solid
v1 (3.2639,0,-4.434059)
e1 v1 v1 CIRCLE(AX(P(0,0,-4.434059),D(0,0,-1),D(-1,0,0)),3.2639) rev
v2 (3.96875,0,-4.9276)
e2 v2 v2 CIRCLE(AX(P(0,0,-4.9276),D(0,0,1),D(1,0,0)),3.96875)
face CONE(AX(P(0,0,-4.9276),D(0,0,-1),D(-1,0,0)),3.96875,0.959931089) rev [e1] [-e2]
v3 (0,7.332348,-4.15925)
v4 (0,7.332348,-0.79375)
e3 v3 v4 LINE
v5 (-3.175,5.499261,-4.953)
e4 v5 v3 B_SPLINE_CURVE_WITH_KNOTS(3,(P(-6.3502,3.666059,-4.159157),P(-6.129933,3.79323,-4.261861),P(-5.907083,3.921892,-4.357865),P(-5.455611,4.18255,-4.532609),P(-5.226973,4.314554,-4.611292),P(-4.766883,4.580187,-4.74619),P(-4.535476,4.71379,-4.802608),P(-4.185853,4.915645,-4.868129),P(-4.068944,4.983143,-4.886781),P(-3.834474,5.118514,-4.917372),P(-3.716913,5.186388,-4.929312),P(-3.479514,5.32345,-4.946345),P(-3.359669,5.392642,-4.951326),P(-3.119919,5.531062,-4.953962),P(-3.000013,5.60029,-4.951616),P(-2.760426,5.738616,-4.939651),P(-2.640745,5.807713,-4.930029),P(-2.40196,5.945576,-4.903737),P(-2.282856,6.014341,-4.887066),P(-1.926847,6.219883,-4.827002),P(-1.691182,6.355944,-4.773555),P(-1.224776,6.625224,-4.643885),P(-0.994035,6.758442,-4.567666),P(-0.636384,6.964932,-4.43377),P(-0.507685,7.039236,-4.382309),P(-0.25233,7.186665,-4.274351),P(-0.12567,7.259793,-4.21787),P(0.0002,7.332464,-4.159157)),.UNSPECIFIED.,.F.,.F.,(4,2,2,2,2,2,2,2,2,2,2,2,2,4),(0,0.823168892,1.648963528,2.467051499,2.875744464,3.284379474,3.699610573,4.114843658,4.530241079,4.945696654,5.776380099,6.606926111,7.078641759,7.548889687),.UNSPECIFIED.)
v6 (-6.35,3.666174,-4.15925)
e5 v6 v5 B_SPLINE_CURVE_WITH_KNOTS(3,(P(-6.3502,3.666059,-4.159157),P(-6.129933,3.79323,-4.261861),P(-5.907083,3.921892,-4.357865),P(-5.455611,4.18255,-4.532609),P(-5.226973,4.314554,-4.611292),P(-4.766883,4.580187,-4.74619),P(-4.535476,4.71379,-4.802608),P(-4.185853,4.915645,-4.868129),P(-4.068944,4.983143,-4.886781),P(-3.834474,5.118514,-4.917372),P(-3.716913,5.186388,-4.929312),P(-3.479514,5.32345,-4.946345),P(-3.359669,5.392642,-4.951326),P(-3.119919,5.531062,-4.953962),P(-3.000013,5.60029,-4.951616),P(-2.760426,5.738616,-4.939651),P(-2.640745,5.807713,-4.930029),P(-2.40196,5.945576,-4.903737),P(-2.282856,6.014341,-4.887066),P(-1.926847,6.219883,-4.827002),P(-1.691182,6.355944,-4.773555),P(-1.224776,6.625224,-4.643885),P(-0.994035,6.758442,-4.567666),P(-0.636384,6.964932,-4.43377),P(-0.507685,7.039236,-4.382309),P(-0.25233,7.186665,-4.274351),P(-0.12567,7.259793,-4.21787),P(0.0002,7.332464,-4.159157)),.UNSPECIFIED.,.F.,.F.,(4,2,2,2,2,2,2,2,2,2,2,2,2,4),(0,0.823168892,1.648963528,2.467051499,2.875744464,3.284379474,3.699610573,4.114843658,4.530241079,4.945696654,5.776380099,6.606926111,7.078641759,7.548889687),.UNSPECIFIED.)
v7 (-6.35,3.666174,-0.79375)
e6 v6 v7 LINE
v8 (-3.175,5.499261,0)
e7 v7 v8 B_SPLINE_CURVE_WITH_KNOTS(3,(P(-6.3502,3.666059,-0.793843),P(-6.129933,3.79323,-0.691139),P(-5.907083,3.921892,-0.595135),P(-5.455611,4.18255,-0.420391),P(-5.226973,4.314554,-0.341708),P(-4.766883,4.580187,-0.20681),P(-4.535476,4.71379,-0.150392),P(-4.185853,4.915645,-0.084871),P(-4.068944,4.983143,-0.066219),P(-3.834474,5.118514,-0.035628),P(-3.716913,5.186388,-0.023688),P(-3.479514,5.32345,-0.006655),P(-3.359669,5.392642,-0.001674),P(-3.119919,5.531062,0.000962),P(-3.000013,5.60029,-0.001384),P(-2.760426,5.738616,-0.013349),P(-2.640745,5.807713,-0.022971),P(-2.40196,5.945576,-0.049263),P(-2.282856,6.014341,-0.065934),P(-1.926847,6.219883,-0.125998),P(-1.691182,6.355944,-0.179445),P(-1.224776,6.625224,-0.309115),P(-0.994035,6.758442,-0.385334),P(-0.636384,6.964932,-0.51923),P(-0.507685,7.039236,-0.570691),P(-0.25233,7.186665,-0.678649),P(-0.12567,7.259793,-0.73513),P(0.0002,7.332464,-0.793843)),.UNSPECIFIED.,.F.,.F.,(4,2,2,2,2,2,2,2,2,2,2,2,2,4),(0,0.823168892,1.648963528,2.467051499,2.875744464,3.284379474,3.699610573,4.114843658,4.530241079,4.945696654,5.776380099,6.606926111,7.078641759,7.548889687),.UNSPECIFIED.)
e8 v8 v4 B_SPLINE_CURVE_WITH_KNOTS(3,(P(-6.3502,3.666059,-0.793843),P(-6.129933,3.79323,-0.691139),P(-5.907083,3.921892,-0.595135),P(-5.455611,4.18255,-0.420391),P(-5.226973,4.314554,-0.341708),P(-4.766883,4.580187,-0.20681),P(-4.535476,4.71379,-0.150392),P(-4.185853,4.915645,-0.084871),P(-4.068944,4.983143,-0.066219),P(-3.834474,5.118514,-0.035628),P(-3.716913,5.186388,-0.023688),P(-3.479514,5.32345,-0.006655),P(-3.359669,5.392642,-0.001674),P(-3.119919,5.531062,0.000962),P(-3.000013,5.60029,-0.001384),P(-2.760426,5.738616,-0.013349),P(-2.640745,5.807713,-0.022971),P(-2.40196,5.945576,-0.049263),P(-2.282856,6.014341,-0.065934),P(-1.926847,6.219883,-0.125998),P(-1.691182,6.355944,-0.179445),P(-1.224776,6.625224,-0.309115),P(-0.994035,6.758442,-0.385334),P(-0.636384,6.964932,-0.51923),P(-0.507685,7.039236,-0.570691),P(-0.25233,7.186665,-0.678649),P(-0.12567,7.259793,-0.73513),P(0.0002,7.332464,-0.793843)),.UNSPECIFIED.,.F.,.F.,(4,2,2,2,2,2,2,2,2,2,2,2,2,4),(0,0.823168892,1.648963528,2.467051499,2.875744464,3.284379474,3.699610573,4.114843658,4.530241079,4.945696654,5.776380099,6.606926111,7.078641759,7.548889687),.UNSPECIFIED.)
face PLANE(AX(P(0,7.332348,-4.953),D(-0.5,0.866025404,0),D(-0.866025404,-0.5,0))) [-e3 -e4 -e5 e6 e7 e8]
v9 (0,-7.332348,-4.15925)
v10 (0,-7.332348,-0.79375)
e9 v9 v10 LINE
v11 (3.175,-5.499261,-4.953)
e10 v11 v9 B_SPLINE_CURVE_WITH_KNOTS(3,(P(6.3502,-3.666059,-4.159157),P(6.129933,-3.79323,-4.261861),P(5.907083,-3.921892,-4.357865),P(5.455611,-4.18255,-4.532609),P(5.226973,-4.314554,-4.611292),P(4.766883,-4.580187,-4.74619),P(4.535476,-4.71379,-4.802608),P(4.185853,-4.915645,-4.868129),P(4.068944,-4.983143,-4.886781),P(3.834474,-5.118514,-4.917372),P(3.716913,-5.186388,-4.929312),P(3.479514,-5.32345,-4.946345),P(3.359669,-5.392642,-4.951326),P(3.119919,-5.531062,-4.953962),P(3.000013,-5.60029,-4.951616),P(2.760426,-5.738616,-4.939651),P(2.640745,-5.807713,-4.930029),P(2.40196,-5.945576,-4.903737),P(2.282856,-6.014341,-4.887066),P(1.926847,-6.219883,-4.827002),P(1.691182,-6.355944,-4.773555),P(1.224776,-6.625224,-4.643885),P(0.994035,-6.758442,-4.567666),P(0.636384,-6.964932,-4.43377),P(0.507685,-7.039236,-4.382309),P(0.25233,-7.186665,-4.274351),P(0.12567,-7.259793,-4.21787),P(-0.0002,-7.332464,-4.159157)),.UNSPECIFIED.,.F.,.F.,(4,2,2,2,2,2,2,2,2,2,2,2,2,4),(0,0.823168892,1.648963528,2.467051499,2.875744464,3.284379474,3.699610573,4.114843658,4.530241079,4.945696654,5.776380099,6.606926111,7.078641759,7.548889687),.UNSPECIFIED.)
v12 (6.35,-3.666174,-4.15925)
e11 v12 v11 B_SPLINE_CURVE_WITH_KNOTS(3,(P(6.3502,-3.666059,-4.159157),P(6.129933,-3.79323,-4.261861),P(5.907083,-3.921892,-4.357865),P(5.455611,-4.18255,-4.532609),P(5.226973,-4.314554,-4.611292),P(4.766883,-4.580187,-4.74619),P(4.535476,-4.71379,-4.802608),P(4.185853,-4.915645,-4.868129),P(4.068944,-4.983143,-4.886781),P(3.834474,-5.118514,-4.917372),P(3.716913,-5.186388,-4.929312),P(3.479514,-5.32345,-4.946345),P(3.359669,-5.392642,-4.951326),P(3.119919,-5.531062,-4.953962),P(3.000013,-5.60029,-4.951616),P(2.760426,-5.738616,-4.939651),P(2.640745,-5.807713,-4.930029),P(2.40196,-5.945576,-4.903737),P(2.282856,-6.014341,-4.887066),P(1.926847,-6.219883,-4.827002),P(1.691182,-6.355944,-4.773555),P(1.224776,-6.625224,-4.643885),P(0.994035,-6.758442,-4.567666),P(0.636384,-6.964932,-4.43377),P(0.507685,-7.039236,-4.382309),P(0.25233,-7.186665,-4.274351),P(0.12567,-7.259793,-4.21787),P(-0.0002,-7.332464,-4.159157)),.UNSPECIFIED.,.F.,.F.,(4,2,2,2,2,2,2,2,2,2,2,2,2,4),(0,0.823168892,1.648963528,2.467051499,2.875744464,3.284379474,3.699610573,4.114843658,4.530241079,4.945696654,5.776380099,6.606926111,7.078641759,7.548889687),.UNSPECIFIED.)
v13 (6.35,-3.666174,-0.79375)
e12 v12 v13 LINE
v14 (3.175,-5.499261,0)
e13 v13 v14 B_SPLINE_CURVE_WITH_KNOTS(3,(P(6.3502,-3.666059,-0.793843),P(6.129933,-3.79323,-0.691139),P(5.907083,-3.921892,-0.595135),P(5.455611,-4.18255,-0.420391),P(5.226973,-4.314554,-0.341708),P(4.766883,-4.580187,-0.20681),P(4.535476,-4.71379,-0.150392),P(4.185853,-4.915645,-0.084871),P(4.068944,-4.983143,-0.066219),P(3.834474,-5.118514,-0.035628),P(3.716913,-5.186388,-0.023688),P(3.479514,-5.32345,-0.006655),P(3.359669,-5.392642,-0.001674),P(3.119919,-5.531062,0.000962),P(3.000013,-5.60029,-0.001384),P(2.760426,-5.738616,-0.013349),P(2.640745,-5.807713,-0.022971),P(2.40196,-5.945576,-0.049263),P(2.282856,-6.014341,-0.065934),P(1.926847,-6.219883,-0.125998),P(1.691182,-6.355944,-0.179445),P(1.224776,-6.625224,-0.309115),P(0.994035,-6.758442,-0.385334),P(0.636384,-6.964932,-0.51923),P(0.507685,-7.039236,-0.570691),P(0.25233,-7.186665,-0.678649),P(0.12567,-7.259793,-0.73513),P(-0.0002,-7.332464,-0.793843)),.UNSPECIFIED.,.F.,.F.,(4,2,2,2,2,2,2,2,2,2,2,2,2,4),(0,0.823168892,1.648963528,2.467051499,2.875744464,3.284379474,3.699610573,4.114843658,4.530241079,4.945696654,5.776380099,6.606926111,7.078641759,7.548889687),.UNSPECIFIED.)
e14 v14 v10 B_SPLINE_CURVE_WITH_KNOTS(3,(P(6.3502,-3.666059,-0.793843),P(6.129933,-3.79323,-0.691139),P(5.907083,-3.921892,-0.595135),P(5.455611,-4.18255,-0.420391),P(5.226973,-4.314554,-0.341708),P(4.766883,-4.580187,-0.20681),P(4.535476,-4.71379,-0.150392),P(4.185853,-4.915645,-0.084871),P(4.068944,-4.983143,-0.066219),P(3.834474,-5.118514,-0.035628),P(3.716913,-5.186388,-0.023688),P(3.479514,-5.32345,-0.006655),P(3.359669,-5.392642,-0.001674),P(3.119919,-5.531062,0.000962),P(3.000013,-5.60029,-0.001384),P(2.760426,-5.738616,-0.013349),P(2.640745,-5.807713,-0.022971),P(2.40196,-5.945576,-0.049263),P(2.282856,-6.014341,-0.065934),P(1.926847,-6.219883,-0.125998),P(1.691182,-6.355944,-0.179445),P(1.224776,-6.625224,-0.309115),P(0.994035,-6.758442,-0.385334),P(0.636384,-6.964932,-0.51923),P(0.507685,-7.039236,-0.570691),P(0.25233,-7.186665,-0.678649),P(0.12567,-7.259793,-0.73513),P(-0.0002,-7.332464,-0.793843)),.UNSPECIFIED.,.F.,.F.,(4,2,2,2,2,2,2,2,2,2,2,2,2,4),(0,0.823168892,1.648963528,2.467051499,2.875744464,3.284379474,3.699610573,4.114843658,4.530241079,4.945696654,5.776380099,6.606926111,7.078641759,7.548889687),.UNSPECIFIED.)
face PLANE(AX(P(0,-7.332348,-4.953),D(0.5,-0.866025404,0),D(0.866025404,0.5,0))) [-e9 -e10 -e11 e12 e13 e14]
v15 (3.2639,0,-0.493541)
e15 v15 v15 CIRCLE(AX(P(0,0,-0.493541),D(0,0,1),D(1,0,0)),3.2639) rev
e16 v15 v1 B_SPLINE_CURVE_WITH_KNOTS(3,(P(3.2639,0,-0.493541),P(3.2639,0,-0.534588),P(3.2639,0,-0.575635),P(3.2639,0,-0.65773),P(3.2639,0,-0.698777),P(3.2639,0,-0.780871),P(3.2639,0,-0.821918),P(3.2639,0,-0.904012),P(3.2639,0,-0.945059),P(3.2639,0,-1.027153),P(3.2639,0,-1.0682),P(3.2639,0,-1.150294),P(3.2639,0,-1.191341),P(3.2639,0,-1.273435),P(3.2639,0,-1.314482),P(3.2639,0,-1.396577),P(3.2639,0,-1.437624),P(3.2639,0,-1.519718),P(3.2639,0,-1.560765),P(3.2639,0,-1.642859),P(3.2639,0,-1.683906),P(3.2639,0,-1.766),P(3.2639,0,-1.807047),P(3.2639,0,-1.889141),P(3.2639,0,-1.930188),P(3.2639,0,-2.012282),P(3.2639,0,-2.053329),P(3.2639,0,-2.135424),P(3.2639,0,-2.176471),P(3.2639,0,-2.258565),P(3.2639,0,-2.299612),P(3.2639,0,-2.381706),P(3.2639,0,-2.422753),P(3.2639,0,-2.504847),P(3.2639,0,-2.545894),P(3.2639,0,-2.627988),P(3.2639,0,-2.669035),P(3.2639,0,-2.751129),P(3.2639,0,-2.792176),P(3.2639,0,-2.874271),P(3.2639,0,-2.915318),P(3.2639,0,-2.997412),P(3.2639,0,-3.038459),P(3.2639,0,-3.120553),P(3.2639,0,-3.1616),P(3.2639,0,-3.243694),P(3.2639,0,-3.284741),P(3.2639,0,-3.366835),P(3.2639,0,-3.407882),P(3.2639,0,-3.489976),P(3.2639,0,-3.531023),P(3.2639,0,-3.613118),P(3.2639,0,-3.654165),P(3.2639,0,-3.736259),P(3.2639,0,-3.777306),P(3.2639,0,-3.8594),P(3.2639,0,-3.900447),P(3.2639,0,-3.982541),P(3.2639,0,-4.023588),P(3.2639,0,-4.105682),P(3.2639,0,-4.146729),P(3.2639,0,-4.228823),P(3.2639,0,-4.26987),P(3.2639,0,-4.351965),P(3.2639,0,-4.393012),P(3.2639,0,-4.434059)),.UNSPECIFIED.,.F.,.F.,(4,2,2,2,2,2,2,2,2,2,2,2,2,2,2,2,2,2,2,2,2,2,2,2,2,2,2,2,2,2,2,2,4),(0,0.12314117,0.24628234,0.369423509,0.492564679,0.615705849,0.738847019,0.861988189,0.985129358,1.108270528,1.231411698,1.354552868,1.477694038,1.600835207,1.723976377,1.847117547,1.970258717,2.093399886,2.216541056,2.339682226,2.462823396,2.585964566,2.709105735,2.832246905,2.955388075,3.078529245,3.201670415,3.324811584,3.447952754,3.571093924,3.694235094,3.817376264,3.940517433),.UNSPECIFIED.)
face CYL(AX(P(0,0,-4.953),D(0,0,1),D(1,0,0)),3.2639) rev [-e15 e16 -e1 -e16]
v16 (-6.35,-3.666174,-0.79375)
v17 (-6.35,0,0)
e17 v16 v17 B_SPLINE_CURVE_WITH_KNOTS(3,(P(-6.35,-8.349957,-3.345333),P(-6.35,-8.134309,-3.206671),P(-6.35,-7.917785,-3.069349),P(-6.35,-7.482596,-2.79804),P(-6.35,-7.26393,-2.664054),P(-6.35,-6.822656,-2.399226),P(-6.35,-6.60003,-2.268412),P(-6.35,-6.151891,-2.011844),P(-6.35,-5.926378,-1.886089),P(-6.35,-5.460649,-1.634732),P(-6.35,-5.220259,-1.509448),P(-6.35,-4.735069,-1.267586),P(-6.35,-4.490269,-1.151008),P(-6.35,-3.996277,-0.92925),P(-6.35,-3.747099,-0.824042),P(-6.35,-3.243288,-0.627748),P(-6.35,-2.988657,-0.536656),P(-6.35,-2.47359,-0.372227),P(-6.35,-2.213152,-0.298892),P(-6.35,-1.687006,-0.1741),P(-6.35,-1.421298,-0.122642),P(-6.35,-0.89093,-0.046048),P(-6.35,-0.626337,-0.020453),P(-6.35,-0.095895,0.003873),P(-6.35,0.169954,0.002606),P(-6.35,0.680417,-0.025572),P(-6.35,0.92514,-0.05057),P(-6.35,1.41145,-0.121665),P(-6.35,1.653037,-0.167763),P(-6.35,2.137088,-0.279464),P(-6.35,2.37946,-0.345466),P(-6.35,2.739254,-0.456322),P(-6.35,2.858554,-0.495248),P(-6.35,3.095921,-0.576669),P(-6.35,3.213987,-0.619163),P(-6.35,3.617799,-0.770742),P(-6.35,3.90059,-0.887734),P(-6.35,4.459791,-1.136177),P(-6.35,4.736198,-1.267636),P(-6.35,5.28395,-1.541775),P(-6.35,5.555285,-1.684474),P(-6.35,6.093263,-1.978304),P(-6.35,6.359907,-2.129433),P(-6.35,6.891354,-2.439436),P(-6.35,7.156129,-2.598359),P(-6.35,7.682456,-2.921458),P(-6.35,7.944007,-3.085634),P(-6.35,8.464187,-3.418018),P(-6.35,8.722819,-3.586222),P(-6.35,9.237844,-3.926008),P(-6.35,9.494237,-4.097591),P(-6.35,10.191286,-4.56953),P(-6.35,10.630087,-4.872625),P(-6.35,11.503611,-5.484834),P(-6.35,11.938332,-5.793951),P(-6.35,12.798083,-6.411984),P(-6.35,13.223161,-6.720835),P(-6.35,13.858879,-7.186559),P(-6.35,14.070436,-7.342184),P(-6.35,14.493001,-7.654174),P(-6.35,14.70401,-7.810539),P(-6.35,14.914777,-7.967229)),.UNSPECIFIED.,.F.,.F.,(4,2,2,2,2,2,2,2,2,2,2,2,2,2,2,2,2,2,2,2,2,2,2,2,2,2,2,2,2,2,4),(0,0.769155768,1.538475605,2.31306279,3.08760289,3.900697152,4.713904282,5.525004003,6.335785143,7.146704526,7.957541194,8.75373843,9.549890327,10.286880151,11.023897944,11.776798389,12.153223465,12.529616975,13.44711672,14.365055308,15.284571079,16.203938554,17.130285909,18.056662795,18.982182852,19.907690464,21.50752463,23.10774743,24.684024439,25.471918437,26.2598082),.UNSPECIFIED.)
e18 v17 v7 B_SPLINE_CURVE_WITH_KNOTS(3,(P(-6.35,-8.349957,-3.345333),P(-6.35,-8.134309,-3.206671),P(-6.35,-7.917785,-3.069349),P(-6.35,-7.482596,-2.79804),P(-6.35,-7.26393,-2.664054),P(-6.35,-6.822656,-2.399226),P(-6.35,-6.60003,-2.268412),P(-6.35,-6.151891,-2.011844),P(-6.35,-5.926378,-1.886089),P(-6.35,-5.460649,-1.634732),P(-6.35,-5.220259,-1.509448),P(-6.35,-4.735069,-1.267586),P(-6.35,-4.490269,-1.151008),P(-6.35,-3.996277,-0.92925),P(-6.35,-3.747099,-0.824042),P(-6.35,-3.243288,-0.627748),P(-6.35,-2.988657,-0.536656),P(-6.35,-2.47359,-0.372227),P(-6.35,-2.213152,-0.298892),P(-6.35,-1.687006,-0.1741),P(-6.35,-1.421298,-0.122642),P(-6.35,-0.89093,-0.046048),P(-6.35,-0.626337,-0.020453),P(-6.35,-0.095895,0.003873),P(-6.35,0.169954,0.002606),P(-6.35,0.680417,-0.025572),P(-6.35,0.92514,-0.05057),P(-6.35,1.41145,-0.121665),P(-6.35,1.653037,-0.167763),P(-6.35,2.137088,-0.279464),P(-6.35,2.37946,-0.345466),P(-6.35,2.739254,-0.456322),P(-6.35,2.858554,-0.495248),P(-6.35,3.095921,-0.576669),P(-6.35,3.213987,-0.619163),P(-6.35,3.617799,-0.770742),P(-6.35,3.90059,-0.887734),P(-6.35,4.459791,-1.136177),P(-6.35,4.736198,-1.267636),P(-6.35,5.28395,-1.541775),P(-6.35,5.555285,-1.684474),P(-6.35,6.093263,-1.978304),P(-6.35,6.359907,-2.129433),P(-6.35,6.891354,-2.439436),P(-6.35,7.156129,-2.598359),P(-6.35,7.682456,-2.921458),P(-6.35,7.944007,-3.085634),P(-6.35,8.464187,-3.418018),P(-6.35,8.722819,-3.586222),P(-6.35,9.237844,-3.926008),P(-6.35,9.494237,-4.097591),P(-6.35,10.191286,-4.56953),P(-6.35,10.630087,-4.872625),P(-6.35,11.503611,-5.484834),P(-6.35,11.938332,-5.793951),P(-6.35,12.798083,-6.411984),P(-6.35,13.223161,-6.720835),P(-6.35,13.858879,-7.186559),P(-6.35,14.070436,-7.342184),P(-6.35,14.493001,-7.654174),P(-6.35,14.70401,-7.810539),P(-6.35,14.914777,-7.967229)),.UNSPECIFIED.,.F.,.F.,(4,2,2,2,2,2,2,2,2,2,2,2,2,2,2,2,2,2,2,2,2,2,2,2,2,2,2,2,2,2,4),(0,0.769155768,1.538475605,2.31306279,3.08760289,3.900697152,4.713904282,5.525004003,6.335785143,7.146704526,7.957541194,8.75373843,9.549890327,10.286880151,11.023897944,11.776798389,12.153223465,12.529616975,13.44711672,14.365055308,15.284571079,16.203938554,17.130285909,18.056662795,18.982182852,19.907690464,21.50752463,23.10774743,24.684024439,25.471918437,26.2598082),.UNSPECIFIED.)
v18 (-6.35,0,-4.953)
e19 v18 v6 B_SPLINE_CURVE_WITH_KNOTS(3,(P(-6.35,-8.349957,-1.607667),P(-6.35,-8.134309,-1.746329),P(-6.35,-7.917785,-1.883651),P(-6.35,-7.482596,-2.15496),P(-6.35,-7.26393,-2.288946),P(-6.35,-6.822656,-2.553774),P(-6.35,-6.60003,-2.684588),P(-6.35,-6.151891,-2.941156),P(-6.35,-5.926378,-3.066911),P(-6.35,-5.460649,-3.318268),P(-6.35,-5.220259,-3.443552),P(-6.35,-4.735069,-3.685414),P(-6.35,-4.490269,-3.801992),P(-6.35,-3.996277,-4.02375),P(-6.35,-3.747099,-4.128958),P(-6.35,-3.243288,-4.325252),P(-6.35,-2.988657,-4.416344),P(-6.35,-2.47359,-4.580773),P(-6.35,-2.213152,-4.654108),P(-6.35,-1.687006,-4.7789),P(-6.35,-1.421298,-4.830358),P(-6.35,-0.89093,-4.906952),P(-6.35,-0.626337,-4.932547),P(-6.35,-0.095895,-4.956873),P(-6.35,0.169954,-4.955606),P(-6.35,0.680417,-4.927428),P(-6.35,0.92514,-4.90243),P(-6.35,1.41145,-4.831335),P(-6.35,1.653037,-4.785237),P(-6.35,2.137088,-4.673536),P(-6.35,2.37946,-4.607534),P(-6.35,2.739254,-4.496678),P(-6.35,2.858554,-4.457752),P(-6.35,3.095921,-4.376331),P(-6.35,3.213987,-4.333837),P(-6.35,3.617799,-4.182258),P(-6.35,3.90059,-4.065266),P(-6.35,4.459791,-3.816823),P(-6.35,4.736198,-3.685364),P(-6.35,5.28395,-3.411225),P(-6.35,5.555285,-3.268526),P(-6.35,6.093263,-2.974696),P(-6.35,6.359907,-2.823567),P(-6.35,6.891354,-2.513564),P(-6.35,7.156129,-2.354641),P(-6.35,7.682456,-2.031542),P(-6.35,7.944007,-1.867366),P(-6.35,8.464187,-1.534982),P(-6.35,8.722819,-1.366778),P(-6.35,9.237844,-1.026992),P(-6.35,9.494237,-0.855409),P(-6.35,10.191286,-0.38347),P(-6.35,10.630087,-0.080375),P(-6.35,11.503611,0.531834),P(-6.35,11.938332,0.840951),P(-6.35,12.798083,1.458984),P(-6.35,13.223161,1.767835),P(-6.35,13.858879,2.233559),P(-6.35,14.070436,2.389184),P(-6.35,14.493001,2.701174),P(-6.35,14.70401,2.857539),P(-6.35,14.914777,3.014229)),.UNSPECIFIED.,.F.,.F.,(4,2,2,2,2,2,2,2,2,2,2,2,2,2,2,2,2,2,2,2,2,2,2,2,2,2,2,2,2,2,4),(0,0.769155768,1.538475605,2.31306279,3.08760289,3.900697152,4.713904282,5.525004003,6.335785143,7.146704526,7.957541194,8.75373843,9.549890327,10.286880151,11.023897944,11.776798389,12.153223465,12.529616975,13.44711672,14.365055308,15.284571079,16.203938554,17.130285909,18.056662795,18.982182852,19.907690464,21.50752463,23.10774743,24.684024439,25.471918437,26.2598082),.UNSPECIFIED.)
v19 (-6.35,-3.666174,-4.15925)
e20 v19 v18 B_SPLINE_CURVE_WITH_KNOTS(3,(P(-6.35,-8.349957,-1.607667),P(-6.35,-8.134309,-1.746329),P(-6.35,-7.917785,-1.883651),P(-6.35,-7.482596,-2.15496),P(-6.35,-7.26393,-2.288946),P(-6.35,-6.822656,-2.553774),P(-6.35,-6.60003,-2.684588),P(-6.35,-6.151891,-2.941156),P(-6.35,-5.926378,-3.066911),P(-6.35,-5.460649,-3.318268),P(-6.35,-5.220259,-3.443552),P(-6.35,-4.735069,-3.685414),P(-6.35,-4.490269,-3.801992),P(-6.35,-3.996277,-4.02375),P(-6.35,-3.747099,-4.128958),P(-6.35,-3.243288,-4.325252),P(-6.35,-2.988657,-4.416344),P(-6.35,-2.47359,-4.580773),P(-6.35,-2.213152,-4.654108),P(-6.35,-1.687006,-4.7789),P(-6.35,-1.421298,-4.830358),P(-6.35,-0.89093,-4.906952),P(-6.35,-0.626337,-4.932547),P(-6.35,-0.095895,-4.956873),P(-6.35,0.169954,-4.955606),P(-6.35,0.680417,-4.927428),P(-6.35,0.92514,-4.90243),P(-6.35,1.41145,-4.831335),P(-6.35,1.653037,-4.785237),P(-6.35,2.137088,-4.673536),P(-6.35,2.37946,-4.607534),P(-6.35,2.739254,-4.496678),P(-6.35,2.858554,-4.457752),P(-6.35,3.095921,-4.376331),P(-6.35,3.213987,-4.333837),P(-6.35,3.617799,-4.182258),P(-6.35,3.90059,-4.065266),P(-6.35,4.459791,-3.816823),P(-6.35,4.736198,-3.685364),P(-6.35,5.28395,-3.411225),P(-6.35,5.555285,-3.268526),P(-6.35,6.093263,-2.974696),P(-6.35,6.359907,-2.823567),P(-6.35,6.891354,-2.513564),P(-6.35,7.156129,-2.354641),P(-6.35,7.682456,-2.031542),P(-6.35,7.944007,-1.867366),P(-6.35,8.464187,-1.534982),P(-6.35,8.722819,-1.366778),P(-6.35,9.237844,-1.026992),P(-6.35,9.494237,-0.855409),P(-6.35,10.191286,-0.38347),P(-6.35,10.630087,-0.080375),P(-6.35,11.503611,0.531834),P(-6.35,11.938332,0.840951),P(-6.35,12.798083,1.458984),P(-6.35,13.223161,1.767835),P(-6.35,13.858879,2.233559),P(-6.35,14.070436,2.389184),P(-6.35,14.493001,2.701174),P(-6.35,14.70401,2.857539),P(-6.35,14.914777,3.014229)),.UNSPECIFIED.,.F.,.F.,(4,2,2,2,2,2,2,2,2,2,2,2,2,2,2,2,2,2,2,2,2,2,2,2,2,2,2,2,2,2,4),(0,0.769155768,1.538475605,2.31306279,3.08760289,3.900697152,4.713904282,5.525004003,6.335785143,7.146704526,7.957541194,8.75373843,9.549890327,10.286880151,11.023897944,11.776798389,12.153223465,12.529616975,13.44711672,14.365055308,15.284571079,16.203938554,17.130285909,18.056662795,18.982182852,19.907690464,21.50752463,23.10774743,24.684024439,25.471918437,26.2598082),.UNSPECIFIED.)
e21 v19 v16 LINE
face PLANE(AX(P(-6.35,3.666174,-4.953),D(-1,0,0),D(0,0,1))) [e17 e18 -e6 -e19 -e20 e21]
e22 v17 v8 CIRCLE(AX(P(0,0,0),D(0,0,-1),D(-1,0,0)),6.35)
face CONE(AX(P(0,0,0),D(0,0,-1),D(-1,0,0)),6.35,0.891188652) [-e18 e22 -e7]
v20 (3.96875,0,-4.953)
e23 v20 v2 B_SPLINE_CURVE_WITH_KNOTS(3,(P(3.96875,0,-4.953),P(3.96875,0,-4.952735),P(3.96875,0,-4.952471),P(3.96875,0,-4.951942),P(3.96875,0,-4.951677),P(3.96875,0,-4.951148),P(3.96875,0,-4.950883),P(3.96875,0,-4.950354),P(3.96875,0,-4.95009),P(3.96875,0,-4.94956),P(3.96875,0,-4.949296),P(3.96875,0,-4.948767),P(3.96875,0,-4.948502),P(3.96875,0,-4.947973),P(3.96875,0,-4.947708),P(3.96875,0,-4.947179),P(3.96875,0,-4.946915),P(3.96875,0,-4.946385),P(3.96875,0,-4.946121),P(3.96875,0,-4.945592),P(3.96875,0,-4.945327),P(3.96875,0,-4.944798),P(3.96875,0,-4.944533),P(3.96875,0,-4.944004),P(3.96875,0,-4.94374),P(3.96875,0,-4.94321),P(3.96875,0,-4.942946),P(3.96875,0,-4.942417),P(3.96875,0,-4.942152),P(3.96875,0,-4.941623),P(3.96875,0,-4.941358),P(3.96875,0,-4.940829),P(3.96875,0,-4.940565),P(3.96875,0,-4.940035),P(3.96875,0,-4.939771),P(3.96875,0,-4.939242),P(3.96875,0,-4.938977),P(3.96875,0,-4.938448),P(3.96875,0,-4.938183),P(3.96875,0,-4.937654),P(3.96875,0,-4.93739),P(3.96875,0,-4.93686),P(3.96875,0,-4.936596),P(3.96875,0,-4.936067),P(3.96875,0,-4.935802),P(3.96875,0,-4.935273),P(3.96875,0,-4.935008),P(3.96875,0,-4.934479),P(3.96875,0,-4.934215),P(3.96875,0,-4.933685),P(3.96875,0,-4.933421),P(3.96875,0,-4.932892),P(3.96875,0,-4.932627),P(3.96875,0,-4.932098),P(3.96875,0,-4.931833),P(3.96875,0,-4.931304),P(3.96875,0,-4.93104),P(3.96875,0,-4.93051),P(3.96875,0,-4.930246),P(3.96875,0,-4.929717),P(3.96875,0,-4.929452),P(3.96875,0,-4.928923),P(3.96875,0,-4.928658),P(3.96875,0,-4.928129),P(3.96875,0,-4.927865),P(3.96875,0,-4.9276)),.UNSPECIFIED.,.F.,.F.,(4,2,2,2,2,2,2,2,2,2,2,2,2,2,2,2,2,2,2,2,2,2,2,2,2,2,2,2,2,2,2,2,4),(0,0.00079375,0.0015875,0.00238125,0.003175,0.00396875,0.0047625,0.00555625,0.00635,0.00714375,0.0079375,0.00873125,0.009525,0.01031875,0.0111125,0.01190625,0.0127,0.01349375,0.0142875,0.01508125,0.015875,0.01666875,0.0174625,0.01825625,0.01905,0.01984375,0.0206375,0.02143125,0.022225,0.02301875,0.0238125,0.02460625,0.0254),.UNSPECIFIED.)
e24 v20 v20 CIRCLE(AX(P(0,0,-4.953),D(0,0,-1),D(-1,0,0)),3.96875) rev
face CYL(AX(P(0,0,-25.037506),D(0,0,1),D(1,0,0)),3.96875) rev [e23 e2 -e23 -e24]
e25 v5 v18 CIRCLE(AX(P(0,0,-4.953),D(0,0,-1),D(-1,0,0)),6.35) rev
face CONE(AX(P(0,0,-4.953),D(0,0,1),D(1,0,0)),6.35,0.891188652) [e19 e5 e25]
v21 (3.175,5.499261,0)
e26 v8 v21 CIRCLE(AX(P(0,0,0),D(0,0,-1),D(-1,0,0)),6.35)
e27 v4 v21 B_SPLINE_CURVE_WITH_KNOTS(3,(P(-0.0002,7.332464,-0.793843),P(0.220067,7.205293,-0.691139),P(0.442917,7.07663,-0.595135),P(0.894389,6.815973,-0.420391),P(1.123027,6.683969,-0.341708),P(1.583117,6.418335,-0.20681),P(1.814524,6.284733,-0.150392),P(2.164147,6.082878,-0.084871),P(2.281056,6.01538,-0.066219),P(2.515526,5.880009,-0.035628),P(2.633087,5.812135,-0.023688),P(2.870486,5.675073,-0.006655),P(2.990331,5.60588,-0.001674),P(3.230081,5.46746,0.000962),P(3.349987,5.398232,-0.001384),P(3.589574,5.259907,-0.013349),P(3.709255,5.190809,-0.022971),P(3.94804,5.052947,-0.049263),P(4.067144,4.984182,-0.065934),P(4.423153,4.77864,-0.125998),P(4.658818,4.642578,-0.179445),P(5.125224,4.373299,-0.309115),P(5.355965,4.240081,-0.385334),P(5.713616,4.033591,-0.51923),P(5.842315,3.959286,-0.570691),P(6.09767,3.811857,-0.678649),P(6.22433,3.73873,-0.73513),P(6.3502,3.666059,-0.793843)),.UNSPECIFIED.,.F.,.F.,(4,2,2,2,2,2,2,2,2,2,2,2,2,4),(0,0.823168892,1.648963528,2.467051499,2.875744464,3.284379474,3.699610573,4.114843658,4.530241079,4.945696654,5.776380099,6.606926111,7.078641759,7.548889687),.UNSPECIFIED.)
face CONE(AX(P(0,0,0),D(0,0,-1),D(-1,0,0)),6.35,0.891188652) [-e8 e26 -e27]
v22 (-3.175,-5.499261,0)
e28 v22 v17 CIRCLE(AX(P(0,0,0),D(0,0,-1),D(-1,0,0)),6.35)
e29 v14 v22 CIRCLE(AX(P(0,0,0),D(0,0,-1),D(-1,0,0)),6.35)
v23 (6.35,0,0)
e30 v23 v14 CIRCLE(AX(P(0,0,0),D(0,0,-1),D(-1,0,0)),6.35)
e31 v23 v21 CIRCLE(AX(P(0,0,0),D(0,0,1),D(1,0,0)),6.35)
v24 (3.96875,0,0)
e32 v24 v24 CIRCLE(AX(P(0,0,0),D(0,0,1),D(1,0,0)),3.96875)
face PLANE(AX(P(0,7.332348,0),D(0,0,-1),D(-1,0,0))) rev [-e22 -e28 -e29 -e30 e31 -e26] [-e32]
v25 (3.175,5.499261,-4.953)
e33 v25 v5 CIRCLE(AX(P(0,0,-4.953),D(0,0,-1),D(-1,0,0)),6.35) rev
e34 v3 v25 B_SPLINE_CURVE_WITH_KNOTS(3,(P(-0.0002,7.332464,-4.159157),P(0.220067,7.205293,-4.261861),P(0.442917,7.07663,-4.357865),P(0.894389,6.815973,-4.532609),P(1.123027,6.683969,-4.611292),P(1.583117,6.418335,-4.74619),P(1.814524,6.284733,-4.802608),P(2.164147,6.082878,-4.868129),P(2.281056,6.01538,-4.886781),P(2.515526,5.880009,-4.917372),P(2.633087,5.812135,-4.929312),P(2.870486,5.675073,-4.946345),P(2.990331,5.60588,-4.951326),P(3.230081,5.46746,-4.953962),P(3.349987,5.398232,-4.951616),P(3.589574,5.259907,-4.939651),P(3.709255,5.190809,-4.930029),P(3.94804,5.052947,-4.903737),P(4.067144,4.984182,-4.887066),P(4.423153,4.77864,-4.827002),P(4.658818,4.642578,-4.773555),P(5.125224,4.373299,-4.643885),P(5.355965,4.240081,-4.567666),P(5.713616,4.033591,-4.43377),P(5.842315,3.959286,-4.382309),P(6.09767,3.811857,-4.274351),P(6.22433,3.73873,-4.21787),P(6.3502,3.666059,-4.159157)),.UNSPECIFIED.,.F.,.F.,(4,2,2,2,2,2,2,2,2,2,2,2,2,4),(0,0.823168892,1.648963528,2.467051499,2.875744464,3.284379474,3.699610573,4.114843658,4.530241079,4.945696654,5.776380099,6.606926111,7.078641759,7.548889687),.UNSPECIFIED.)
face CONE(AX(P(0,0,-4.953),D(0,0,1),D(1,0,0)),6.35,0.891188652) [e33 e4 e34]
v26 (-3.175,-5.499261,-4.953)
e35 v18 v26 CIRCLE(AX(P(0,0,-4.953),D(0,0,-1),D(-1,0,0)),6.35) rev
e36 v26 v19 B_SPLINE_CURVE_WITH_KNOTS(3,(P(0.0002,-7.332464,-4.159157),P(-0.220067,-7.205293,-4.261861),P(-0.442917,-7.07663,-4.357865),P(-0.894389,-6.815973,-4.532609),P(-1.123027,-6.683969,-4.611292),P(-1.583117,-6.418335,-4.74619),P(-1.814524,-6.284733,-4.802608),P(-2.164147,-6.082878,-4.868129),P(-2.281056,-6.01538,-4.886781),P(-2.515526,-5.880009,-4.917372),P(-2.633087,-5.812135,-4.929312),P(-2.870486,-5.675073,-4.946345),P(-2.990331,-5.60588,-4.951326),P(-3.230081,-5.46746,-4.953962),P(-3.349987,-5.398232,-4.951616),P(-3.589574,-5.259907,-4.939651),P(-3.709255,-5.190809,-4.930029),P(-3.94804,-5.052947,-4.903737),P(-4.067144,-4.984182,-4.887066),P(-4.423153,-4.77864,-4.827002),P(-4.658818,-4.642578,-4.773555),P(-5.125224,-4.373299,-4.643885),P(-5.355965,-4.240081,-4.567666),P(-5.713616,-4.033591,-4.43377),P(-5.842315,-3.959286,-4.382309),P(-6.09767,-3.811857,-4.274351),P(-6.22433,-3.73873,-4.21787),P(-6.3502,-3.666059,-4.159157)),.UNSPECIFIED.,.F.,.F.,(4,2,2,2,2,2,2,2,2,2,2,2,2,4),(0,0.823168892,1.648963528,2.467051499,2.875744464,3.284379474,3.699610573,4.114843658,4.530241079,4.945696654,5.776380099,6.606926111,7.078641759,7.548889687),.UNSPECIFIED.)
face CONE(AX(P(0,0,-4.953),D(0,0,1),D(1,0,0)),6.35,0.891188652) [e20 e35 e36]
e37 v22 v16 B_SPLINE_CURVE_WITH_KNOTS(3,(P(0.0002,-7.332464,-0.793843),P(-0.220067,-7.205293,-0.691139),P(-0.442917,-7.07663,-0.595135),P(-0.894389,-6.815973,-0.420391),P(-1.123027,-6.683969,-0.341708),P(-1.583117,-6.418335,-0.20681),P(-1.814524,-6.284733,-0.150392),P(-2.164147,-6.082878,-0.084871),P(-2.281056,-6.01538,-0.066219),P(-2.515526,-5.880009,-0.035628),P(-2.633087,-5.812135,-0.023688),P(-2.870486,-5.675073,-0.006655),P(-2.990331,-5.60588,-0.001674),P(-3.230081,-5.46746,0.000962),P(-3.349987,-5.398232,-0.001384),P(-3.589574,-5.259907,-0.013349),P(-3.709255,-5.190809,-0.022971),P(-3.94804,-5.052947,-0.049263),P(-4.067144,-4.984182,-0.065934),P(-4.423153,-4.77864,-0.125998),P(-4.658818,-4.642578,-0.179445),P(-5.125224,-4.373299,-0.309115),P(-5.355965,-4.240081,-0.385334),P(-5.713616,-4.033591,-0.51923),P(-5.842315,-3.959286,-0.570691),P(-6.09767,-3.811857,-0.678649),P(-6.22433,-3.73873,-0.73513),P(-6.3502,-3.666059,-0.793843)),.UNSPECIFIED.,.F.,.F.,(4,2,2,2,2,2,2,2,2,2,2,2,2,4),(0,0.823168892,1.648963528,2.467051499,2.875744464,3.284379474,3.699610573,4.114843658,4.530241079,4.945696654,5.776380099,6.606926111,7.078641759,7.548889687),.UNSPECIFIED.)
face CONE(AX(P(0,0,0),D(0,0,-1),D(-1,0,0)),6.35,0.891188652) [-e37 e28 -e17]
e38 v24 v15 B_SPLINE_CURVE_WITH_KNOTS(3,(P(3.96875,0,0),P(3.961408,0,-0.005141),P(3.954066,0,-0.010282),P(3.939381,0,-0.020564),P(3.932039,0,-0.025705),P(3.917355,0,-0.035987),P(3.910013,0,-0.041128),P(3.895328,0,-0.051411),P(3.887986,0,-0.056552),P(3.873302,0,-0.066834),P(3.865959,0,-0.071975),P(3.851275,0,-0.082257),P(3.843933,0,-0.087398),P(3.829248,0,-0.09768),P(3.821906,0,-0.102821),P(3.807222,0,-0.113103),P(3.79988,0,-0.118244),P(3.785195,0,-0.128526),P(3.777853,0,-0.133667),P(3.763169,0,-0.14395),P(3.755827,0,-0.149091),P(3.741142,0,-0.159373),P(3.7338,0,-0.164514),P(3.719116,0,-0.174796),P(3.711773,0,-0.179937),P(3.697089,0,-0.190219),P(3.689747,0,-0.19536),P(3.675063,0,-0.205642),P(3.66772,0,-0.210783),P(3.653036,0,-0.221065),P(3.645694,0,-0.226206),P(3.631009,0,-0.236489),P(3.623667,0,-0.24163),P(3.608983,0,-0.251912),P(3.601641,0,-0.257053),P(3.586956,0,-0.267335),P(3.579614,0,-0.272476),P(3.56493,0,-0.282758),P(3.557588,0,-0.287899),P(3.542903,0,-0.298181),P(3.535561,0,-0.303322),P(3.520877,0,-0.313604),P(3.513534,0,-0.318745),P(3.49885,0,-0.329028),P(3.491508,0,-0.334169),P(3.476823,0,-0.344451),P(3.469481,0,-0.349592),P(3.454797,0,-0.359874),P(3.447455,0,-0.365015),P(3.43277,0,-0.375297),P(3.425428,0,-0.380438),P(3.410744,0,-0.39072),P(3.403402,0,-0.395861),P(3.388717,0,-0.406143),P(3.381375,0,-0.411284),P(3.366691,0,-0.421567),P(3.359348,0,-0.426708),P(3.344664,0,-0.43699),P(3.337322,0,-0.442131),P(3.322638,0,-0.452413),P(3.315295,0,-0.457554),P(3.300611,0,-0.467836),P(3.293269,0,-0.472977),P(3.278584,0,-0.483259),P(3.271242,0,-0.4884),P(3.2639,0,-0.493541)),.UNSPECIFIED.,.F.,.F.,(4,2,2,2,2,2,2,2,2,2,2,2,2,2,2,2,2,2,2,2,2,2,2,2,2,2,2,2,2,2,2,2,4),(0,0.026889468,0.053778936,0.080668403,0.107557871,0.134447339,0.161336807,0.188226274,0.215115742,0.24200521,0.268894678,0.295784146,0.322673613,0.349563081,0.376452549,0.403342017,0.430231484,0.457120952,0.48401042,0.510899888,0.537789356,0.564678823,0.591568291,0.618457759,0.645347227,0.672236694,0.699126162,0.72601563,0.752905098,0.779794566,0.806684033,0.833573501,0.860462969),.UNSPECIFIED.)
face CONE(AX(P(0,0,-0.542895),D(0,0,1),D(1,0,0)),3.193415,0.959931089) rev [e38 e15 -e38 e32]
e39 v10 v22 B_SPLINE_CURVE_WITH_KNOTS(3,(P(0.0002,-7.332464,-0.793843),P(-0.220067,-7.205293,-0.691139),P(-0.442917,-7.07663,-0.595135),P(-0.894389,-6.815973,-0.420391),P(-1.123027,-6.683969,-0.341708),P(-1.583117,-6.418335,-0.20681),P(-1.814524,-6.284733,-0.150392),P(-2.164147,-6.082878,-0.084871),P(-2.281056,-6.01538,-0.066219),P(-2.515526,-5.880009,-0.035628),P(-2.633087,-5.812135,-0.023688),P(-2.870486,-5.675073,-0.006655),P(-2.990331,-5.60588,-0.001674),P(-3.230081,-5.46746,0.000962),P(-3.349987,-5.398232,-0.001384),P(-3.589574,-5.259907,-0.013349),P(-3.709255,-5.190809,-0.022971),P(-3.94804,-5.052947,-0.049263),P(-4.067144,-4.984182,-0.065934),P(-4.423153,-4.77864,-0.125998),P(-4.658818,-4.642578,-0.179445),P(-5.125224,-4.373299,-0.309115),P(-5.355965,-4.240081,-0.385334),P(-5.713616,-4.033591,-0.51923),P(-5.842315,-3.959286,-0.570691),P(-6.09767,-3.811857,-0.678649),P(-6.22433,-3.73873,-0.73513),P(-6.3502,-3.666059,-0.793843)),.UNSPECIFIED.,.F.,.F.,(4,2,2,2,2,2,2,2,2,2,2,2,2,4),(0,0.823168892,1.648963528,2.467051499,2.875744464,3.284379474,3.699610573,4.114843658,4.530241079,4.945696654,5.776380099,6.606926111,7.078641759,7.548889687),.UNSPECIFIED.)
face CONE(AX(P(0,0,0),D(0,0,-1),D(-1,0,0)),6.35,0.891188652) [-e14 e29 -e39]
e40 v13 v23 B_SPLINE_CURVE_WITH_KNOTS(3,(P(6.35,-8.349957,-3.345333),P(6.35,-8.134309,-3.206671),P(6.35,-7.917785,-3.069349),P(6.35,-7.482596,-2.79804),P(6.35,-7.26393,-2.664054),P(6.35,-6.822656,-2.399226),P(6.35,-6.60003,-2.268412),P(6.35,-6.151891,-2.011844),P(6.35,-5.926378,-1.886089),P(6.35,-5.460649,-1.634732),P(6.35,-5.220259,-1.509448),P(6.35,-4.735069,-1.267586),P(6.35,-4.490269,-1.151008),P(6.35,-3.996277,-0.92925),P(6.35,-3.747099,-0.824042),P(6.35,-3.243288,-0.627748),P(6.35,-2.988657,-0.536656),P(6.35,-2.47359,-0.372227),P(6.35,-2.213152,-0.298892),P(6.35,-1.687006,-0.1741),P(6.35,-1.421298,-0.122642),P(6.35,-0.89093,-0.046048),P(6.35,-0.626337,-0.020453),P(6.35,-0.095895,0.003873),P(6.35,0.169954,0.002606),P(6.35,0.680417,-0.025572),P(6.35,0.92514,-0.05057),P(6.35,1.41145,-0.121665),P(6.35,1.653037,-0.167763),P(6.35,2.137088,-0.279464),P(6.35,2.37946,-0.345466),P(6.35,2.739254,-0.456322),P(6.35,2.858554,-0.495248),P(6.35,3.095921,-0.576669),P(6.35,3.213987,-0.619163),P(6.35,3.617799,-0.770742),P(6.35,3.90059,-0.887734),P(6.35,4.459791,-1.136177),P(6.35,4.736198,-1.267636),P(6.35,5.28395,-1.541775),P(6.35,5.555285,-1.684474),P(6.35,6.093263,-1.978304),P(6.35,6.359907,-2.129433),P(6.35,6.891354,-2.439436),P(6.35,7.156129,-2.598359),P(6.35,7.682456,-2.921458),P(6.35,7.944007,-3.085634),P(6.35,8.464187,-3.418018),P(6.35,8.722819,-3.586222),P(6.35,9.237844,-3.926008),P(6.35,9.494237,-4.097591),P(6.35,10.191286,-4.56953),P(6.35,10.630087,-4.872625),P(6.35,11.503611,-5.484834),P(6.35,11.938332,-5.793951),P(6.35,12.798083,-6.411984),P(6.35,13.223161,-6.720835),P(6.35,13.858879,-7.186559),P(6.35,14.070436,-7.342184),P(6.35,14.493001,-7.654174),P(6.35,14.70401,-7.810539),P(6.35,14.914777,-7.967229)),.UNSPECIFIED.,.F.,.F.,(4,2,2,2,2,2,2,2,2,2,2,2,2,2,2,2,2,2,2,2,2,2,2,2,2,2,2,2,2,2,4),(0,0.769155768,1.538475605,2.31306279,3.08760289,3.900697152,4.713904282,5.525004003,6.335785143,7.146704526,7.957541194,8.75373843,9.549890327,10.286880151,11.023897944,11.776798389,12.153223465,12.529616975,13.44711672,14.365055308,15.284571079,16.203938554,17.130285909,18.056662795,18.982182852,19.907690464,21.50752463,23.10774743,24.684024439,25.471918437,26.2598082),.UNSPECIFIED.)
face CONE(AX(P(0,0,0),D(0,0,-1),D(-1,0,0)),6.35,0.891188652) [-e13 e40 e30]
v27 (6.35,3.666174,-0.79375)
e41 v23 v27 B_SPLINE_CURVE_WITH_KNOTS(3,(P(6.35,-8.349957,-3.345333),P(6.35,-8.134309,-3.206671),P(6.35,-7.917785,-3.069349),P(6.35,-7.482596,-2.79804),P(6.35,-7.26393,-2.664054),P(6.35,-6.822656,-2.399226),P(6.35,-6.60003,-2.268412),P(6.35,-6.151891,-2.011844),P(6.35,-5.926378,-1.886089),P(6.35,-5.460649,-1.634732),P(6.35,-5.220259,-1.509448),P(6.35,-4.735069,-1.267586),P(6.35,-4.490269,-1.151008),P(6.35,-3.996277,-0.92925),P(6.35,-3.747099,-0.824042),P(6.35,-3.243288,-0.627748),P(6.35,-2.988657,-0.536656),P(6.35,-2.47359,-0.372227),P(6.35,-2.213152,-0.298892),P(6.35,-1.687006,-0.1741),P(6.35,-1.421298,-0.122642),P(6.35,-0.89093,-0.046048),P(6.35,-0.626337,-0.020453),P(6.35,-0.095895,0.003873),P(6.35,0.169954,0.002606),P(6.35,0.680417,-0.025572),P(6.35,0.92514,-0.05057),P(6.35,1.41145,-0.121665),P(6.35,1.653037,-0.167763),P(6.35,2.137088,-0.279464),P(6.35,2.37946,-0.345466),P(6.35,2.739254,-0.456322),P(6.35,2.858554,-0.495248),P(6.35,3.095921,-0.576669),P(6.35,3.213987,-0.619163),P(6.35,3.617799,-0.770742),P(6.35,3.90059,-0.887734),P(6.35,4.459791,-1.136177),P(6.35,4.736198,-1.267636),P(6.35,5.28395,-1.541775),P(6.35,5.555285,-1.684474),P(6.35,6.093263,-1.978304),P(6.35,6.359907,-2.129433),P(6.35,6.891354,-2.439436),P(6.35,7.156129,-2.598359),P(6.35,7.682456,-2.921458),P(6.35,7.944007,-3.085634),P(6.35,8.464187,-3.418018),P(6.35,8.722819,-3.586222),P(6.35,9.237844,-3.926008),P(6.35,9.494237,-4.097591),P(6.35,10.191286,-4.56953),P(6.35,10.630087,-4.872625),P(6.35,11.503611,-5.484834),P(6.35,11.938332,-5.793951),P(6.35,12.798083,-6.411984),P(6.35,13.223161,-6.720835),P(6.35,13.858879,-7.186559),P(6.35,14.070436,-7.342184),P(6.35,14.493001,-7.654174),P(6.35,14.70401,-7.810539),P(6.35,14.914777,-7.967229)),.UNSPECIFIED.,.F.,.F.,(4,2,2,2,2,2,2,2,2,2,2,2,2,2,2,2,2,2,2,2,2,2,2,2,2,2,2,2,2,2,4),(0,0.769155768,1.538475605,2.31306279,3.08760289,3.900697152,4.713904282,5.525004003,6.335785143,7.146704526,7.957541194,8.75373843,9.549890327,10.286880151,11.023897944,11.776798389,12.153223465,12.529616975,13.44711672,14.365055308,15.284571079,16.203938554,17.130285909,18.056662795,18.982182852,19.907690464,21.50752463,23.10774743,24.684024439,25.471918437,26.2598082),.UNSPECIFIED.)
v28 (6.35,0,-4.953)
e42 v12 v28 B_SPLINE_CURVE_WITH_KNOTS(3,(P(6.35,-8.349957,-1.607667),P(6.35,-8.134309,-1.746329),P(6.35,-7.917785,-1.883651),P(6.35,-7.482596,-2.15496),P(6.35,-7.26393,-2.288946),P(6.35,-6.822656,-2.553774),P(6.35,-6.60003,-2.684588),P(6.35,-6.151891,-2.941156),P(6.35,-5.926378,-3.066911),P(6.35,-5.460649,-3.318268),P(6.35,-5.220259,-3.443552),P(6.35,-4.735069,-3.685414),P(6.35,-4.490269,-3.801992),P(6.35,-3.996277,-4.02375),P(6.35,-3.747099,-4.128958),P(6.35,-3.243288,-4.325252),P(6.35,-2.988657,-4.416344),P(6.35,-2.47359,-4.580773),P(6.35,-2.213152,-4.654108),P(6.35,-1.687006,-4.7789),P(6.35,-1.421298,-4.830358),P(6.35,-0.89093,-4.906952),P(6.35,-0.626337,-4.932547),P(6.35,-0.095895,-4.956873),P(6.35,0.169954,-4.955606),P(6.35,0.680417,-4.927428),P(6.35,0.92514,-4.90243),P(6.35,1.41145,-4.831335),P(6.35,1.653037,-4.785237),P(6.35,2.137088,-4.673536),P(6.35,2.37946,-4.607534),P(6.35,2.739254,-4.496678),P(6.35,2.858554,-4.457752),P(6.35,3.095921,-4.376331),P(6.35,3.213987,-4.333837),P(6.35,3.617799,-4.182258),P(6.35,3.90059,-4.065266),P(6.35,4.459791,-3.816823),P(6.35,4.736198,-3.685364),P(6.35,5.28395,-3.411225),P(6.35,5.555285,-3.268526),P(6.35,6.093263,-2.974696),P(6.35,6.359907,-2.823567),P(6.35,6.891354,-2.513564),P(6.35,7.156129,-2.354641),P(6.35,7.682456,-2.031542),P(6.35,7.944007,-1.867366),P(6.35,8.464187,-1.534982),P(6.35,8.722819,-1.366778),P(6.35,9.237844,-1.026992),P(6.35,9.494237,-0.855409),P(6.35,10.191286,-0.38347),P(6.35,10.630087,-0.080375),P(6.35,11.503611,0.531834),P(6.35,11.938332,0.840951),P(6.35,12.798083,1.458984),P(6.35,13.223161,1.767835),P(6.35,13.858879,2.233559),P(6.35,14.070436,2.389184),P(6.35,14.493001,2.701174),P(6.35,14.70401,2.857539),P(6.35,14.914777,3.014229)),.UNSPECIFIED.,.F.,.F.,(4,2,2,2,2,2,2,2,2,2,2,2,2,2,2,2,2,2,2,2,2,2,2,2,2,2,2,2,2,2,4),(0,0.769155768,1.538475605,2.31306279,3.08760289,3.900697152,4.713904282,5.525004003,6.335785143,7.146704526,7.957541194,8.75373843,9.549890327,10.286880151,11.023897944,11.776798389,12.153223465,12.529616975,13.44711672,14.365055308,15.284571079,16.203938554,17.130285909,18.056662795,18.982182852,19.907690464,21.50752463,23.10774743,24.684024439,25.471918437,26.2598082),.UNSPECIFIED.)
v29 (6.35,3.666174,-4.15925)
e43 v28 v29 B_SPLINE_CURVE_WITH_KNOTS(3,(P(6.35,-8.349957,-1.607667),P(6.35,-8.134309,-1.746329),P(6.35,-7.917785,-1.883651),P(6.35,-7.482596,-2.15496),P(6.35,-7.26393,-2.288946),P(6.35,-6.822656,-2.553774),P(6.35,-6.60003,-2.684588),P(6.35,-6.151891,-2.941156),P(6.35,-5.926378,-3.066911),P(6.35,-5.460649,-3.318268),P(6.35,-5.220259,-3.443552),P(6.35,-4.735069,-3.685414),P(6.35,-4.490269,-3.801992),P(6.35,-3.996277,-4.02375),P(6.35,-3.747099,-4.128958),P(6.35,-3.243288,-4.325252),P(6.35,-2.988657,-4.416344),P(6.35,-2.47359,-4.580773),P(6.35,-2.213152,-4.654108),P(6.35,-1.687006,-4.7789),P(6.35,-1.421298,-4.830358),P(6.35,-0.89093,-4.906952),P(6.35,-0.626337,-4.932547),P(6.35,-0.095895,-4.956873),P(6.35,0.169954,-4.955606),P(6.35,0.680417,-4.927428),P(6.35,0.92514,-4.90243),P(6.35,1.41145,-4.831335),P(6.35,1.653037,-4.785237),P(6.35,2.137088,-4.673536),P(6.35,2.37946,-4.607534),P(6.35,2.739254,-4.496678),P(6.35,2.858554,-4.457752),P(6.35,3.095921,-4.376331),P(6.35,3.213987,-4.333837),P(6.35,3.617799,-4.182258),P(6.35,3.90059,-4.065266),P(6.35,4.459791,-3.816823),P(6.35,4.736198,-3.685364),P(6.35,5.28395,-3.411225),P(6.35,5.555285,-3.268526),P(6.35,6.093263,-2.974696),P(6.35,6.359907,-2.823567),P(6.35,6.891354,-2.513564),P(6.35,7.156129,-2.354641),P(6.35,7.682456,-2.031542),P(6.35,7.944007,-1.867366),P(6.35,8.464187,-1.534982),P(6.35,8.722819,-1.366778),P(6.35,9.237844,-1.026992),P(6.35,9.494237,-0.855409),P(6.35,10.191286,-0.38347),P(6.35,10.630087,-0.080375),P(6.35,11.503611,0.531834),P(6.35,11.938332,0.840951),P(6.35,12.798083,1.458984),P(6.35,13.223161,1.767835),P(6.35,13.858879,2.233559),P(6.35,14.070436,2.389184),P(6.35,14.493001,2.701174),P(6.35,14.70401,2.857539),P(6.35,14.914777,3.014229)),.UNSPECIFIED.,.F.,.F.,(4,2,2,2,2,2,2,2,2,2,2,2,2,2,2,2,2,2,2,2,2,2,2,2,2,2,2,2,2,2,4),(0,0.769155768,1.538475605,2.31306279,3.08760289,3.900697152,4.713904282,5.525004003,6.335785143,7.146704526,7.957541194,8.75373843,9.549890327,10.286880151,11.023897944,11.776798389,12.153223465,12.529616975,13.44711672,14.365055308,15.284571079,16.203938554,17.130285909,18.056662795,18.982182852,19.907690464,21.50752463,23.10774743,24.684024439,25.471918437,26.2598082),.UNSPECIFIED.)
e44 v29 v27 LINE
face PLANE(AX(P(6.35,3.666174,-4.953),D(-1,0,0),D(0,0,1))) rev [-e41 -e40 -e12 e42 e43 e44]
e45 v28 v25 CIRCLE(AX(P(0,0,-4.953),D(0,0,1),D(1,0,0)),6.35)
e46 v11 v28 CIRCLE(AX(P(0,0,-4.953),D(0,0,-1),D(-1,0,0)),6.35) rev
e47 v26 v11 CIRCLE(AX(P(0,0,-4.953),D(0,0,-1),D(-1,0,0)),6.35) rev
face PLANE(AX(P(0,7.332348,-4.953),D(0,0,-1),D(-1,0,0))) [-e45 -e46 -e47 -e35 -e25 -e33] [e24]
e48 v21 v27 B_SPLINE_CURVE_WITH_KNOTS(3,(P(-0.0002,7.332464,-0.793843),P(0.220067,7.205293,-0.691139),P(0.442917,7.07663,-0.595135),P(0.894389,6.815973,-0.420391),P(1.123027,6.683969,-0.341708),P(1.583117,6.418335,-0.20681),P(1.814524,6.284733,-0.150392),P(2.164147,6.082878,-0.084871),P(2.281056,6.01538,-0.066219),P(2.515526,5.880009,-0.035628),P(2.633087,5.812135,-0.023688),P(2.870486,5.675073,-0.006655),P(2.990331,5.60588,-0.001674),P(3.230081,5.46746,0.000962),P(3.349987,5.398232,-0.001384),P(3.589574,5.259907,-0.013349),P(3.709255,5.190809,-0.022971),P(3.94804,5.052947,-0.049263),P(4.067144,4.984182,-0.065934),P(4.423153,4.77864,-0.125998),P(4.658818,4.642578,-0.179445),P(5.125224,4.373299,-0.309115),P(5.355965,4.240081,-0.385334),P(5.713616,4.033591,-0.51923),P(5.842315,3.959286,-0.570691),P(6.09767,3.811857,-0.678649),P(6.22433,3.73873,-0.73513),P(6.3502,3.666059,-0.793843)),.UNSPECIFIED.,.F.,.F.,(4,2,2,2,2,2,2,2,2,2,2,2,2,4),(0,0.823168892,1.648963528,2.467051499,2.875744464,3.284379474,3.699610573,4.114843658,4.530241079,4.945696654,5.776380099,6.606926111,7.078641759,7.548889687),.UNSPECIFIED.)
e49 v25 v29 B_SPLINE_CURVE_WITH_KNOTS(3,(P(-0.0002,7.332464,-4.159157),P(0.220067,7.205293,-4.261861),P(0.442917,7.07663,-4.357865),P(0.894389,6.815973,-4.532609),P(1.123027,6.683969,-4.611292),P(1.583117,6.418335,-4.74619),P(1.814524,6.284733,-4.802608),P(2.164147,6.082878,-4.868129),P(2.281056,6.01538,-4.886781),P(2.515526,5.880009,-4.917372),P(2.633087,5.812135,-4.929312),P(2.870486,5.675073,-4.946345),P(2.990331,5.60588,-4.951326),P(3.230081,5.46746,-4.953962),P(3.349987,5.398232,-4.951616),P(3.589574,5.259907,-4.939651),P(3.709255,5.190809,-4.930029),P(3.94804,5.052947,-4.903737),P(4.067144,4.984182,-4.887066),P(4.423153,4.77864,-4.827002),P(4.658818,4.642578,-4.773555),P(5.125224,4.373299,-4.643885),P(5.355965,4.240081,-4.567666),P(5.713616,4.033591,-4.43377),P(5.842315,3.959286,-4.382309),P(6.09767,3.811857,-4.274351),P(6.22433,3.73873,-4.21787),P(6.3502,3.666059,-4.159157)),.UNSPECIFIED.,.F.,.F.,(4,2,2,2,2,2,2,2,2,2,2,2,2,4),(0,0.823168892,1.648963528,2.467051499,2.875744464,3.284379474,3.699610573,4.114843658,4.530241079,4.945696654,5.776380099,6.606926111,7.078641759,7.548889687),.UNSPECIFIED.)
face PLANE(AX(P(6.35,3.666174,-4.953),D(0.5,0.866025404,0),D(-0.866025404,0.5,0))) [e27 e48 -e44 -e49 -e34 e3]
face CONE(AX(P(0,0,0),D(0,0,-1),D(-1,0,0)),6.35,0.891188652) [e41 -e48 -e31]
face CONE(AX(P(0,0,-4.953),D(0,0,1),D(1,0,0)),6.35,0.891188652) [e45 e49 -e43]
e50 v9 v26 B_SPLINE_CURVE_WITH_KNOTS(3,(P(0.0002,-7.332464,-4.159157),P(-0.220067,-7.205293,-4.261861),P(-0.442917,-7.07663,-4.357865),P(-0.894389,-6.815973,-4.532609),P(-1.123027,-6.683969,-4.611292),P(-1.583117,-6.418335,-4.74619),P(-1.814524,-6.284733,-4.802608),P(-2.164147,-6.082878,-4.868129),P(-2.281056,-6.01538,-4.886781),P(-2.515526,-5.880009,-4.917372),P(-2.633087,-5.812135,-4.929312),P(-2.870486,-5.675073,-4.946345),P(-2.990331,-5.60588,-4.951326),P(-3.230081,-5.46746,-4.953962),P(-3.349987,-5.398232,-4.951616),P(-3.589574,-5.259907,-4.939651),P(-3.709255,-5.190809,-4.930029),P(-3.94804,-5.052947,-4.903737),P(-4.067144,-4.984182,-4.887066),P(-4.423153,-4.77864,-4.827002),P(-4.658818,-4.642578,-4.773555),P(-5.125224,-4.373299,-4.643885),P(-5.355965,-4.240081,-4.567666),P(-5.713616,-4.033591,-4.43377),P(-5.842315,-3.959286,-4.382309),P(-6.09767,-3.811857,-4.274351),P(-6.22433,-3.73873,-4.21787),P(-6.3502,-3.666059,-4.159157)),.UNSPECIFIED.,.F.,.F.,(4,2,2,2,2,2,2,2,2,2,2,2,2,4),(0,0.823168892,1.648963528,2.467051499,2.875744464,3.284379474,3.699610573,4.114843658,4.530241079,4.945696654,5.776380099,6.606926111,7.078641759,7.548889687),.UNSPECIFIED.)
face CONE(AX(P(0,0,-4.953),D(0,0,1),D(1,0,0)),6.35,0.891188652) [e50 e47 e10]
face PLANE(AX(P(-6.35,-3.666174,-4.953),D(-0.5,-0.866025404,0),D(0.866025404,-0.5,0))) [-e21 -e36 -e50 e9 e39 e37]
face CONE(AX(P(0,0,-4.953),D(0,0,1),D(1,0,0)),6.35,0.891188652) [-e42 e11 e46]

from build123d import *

# Parameters (mm, degrees)
THREADSCHEMATIC_START     = -4.953
THREADSCHEMATIC_OUTLINE_R = 3.2639
THREADSCHEMATIC_DEPTH     = 4.953


# Read off the part's stored shape, not the designer's step: ThreadSchematic
with BuildPart() as part:
    # ThreadSchematic outline → ThreadSchematic (new body)
    with BuildSketch(Plane.XY.offset(THREADSCHEMATIC_START)):
        Polygon((6.35, 3.666174209), (0, 7.332348419), (-6.35, 3.666174209), (-6.35, -3.666174209), (0, -7.332348419), (6.35, -3.666174209), align=None)
        Circle(THREADSCHEMATIC_OUTLINE_R, mode=Mode.SUBTRACT)
    extrude(amount=THREADSCHEMATIC_DEPTH)

    # Sketch3 → Double-Chamfer (revolve, cut)
    with BuildSketch(Plane(origin=(0, 0, 0), x_dir=(0, 0, -1), z_dir=(1, 0, 0))):
        Polygon((4.953, 6.35), (4.15925, 7.332348419), (4.15925, 20.032348419), (17.653, 20.032348419), (17.653, 6.35), align=None)
        Polygon((0.79375, 20.032348419), (-12.7, 20.032348419), (-12.7, 6.35), (0, 6.35), (0.79375, 7.332348419), align=None)
    revolve(axis=Axis((0, 0, 0), (0, 0, -1)), mode=Mode.SUBTRACT)

    # EndChamferSke → EndChamfer (revolve, cut)
    with BuildSketch(Plane(origin=(0, 0, 0), x_dir=(0, 0, -1), z_dir=(1, 0, 0)), mode=Mode.PRIVATE) as endchamfer_sk:
        Polygon((4.9276, 3.96875), (4.384704588, 3.193415), (4.9784, 3.193415), (4.9784, 3.96875), align=None)
        Polygon((-0.0508, 3.96875), (0, 3.96875), (0.542895412, 3.193415), (-0.0508, 3.193415), align=None)
    revolve(endchamfer_sk.sketch.rotate(Axis((0, 0, -25.037505729), (0, 0, -1)), 90), axis=Axis((0, 0, -25.037505729), (0, 0, -1)), mode=Mode.SUBTRACT)


solid = part.part
